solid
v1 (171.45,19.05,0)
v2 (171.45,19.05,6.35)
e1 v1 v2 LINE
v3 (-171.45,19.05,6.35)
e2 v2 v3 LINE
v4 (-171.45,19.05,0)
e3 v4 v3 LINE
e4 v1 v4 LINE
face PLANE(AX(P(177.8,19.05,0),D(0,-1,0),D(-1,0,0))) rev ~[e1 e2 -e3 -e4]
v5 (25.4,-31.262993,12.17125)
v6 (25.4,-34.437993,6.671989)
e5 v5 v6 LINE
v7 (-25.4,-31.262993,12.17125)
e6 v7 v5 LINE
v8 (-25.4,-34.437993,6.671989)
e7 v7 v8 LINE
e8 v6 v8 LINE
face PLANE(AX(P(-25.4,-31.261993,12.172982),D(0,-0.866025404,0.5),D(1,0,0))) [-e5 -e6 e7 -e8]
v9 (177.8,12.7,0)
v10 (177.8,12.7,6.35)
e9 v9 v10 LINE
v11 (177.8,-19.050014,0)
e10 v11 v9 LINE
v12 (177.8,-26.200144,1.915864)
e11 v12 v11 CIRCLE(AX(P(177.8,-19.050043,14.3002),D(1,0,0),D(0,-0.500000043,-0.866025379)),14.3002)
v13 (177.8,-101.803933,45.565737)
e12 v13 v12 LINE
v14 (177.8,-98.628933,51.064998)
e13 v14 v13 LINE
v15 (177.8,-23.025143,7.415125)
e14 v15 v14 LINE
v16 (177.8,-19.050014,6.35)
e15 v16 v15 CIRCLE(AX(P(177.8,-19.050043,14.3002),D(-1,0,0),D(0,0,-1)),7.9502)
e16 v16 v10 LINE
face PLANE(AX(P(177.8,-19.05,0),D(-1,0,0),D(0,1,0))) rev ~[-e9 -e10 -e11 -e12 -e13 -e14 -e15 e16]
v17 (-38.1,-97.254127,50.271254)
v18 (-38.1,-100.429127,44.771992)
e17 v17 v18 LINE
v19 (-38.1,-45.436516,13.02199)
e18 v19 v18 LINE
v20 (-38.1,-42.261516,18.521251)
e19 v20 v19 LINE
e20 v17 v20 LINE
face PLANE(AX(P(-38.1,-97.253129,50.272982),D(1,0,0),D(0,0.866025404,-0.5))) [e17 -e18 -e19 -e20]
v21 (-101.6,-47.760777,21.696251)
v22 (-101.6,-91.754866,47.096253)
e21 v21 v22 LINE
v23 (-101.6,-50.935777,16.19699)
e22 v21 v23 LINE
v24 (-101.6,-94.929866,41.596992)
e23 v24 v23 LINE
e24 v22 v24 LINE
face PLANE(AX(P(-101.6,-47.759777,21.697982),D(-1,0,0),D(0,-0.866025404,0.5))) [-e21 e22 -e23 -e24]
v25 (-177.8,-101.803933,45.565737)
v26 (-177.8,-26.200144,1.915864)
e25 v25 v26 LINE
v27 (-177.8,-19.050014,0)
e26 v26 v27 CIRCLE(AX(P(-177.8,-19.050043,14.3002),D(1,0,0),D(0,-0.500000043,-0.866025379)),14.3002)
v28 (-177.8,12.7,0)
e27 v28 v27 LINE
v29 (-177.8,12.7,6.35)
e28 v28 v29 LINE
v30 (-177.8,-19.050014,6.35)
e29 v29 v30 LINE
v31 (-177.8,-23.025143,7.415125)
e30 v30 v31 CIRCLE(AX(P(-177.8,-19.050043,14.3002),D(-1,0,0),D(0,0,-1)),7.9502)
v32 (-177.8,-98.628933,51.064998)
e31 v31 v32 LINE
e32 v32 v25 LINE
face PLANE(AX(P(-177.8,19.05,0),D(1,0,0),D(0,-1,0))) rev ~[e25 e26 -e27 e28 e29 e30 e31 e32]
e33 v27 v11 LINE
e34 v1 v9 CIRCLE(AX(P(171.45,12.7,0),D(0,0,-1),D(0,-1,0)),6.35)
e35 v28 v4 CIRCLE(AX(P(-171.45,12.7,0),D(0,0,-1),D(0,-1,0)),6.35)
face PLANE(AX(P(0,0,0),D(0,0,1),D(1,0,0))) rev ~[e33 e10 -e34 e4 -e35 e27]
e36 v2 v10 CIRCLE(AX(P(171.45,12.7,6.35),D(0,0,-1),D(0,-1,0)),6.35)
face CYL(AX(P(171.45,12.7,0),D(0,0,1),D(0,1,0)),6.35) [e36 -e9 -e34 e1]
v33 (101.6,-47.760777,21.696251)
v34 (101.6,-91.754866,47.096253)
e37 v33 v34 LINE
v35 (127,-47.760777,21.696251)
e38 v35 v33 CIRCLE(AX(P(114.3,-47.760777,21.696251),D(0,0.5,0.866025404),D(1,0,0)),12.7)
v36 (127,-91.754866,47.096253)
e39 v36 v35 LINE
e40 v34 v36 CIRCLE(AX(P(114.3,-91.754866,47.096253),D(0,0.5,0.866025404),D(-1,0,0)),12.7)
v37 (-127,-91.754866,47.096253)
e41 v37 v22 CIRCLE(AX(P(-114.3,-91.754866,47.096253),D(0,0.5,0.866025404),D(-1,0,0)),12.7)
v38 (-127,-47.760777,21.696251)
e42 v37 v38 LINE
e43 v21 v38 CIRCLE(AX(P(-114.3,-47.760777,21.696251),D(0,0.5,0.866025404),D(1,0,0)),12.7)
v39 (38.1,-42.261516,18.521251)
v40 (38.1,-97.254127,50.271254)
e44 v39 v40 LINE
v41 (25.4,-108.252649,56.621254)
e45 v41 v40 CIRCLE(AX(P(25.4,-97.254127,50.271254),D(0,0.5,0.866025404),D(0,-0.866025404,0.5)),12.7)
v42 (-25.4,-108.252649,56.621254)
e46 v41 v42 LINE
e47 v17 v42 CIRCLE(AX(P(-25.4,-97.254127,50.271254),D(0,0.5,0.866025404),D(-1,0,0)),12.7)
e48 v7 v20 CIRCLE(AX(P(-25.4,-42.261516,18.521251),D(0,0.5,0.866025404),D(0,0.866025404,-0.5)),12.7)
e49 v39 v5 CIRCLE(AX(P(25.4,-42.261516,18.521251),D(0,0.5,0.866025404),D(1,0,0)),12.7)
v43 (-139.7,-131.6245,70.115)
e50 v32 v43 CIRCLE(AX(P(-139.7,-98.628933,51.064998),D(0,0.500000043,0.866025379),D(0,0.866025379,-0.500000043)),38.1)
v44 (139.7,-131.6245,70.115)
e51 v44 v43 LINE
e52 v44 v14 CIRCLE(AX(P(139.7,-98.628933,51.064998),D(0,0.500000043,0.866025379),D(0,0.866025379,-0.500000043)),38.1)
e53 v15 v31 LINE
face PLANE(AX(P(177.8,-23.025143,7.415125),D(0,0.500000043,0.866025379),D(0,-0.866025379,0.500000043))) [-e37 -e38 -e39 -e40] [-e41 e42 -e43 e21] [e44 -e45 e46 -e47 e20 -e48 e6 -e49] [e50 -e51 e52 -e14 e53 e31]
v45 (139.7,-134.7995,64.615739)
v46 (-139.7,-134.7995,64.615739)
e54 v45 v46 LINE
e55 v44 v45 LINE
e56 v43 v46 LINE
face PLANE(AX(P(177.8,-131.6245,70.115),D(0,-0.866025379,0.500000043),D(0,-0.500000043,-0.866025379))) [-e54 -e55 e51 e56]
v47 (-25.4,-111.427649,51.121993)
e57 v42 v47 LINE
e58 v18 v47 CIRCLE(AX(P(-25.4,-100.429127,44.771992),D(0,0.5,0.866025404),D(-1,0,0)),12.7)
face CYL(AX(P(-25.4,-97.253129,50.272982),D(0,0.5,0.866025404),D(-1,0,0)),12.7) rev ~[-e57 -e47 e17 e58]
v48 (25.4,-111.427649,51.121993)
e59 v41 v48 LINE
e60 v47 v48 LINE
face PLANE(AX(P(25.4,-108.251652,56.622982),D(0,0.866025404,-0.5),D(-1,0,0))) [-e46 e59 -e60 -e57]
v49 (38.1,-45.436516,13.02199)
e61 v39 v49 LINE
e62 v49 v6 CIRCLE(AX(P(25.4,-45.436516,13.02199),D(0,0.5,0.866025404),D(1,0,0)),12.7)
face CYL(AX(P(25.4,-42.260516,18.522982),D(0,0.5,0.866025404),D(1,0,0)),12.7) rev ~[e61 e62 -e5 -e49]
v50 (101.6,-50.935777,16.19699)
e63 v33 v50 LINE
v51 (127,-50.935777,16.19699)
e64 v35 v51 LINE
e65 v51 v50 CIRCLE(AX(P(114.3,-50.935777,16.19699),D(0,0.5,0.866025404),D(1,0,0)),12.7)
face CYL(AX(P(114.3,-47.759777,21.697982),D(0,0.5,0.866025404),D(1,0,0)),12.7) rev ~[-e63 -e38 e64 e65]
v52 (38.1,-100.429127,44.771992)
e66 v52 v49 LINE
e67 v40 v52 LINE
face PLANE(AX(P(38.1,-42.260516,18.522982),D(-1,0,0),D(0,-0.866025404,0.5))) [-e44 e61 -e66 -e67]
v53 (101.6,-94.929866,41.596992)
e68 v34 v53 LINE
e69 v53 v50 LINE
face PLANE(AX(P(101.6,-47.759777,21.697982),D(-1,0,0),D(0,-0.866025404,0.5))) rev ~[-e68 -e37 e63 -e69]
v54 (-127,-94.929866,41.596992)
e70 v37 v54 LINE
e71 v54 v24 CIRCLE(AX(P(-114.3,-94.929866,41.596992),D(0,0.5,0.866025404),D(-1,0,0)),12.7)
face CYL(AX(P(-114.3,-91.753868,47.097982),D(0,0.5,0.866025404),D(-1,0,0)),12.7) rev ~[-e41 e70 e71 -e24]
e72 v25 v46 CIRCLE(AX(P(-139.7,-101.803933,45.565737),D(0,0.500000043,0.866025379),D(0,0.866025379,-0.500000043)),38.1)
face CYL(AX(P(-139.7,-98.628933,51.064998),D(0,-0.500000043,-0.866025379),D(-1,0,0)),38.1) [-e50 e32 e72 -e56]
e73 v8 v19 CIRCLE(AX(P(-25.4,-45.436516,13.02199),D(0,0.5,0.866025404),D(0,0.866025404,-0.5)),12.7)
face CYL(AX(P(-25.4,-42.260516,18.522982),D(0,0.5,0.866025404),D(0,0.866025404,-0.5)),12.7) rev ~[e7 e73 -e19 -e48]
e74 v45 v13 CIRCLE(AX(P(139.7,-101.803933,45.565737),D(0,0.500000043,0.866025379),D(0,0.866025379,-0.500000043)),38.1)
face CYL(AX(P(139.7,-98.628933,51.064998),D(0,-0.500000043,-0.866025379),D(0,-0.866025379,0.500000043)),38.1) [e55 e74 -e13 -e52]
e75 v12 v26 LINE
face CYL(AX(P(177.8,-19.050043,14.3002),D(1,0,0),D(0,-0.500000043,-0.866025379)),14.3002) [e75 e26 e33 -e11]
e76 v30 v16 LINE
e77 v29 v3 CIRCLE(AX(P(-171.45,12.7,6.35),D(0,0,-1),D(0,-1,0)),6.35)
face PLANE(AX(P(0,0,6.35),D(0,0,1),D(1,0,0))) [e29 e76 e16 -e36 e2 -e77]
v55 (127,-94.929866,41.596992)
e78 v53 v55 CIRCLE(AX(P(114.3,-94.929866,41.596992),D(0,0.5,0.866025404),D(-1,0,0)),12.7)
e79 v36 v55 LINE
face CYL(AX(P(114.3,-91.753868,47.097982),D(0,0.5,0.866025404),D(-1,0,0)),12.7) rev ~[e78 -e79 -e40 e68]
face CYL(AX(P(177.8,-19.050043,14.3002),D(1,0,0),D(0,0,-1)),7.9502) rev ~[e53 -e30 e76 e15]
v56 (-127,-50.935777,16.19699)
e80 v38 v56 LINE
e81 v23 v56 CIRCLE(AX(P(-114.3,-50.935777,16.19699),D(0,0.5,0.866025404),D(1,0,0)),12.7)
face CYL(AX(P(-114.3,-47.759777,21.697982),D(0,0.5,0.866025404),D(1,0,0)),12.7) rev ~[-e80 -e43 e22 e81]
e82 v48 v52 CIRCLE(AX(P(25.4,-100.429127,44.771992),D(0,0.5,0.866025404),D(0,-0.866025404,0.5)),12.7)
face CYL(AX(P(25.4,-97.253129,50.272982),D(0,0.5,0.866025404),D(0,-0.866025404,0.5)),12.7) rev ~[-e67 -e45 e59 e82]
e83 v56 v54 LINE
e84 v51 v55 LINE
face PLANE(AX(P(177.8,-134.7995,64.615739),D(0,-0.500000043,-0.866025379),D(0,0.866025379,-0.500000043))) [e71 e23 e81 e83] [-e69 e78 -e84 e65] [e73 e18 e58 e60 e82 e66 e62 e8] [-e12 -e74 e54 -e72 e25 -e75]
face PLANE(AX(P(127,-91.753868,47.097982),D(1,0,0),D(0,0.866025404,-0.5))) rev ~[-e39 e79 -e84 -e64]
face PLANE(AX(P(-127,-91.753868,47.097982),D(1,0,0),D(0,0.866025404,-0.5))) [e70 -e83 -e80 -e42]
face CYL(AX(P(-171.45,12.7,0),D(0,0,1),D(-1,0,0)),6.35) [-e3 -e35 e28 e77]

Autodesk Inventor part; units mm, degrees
ref_plane "YZ Plane" through (0, 0, 0) normal (1, 0, 0) x (0, 1, 0)
ref_plane "XZ Plane" through (0, 0, 0) normal (0, 1, 0) x (-1, 0, 0)
ref_plane "XY Plane" through (0, 0, 0) normal (0, 0, 1) x (1, 0, 0)
sketch "Sketch1" plane through (0, 0, 0) normal (0, 0, 1) x (1, 0, 0)
  line L0 (-177.8, -19.05) -> (177.8, -19.05)
  line L1 (177.8, -19.05) -> (177.8, 19.05)
  line L2 (177.8, 19.05) -> (-177.8, 19.05)
  line L3 (-177.8, 19.05) -> (-177.8, -19.05)
  line L4 (-177.8, -19.05) -> (177.8, 19.05) construction
  line L5 (177.8, -19.05) -> (-177.8, 19.05) construction
  point P0 (0, 0)
  point P1 (0, 0)
  dimension "d31" = 355.6
  dimension "d32" = 38.1
extrude "Plate1" add sketch "Sketch1" along normal blind 6.35
sketch "Sketch3" plane through (177.8, -23.0251, 7.4151) normal (0, -0.5, -0.8660254) x (1, 0, 0)
  line L0 (-355.6, 0) -> (0, 0)
  line L1 (0, 0) -> (0, 125.3998)
  line L2 (0, 125.3998) -> (-355.6, 125.3998)
  line L3 (-355.6, 125.3998) -> (-355.6, 0)
edge flange "Flange2" height 139.7 angle 30 thickness 6.35 bend radius 7.9502 thickness toward (0, -0.5, -0.8660254) relief tear relief width 6.35 relief depth 3.175 edges at (0, -19.05, 6.35) wall of the first edge with corners at (-177.8, -23.0251, 7.4151) (177.8, -23.0251, 7.4151) (177.8, -131.6245, 70.115) (-177.8, -131.6245, 70.115)
bend "Bend2"
corner "Corner2"
fillet "Corner Round1" radius 6.35 2 edges at (177.8, 19.05, 3.175) (-177.8, 19.05, 3.175)
fillet "Corner Round2" radius 38.1 2 edges at (177.8, -133.212, 67.3654) (-177.8, -133.212, 67.3654)
sketch "Sketch4" plane through (-177.8, -23.0251, 7.4151) normal (0, 0.5, 0.8660254) x (1, 0, 0)
  line L0 (152.4, -9.5123) -> (203.2, -9.5123)
  line L1 (215.9, -22.2123) -> (215.9, -85.7123)
  line L2 (203.2, -98.4123) -> (152.4, -98.4123)
  line L3 (139.7, -85.7123) -> (139.7, -22.2123)
  line L4 (139.7, -9.5123) -> (215.9, -98.4123) construction
  line L5 (215.9, -9.5123) -> (139.7, -98.4123) construction
  line L6 (38.1, -125.3998) -> (317.5, -125.3998) construction
  arc A0 (152.4, -9.5123) -> (139.7, -22.2123) centre (152.4, -22.2123) ccw
  arc A1 (215.9, -22.2123) -> (203.2, -9.5123) centre (203.2, -22.2123) ccw
  arc A2 (203.2, -98.4123) -> (215.9, -85.7123) centre (203.2, -85.7123) ccw
  arc A3 (139.7, -85.7123) -> (152.4, -98.4123) centre (152.4, -85.7123) ccw
  line L7 (63.5, -79.3623) -> (63.5, -28.5623) construction
  line L8 (50.8, -79.3623) -> (50.8, -28.5623)
  line L9 (76.2, -28.5623) -> (76.2, -79.3623)
  arc A4 (50.8, -79.3623) -> (76.2, -79.3623) centre (63.5, -79.3623) ccw
  arc A5 (76.2, -28.5623) -> (50.8, -28.5623) centre (63.5, -28.5623) ccw
  line L10 (0, -87.2998) -> (0, 0) projected
  line L11 (177.8, -53.9623) -> (177.8, -125.3998) construction
  line L12 (292.1, -79.3623) -> (292.1, -28.5623) construction
  line L13 (304.8, -79.3623) -> (304.8, -28.5623)
  line L14 (279.4, -28.5623) -> (279.4, -79.3623)
  arc A6 (279.4, -79.3623) -> (304.8, -79.3623) centre (292.1, -79.3623) ccw
  arc A7 (304.8, -28.5623) -> (279.4, -28.5623) centre (292.1, -28.5623) ccw
  point P0 (63.5, -53.9623)
  dimension "d45" = 26.9875
  dimension "d46" = 76.2
  dimension "d47" = 88.9
  dimension "d50" = 12.7
  dimension "d51" = 12.7
  dimension "d52" = 50.8
  dimension "d53" = 63.5
  dimension "d54" = 25.4
extrude "Cut1" cut sketch "Sketch4" against normal blind 6.35
equation "\"d48\" = Thickness"
equation "\"d15\" = Thickness"
equation "\"d33\" = BendReliefWidth"
equation "\"d34\" = BendReliefDepth"
equation "\"d35\" = MinimumRemnant"
equation "\"d36\" = TransitionRadius"
equation "\"d39\" = BendRadius"
equation "\"d40\" = CornerReliefSize"
equation "\"d41\" = GapSize"
equation "\"d42\" = JacobiRadiusSize"
equation "\"BendReliefWidth\" = Thickness"
equation "\"BendReliefDepth\" = 0.5 * Thickness"
equation "\"CornerReliefSize\" = 4 * Thickness"
equation "\"MinimumRemnant\" = 2 * Thickness"
equation "\"TransitionRadius\" = BendRadius"
equation "\"JacobiRadiusSize\" = Thickness"
equation "\"GapSize\" = Thickness"
equation "\"Thickness\" = 6.35"
equation "\"BendRadius\" = 7.9502"
properties part number "Model-4_Sheet Stifferner" material "SS304"
